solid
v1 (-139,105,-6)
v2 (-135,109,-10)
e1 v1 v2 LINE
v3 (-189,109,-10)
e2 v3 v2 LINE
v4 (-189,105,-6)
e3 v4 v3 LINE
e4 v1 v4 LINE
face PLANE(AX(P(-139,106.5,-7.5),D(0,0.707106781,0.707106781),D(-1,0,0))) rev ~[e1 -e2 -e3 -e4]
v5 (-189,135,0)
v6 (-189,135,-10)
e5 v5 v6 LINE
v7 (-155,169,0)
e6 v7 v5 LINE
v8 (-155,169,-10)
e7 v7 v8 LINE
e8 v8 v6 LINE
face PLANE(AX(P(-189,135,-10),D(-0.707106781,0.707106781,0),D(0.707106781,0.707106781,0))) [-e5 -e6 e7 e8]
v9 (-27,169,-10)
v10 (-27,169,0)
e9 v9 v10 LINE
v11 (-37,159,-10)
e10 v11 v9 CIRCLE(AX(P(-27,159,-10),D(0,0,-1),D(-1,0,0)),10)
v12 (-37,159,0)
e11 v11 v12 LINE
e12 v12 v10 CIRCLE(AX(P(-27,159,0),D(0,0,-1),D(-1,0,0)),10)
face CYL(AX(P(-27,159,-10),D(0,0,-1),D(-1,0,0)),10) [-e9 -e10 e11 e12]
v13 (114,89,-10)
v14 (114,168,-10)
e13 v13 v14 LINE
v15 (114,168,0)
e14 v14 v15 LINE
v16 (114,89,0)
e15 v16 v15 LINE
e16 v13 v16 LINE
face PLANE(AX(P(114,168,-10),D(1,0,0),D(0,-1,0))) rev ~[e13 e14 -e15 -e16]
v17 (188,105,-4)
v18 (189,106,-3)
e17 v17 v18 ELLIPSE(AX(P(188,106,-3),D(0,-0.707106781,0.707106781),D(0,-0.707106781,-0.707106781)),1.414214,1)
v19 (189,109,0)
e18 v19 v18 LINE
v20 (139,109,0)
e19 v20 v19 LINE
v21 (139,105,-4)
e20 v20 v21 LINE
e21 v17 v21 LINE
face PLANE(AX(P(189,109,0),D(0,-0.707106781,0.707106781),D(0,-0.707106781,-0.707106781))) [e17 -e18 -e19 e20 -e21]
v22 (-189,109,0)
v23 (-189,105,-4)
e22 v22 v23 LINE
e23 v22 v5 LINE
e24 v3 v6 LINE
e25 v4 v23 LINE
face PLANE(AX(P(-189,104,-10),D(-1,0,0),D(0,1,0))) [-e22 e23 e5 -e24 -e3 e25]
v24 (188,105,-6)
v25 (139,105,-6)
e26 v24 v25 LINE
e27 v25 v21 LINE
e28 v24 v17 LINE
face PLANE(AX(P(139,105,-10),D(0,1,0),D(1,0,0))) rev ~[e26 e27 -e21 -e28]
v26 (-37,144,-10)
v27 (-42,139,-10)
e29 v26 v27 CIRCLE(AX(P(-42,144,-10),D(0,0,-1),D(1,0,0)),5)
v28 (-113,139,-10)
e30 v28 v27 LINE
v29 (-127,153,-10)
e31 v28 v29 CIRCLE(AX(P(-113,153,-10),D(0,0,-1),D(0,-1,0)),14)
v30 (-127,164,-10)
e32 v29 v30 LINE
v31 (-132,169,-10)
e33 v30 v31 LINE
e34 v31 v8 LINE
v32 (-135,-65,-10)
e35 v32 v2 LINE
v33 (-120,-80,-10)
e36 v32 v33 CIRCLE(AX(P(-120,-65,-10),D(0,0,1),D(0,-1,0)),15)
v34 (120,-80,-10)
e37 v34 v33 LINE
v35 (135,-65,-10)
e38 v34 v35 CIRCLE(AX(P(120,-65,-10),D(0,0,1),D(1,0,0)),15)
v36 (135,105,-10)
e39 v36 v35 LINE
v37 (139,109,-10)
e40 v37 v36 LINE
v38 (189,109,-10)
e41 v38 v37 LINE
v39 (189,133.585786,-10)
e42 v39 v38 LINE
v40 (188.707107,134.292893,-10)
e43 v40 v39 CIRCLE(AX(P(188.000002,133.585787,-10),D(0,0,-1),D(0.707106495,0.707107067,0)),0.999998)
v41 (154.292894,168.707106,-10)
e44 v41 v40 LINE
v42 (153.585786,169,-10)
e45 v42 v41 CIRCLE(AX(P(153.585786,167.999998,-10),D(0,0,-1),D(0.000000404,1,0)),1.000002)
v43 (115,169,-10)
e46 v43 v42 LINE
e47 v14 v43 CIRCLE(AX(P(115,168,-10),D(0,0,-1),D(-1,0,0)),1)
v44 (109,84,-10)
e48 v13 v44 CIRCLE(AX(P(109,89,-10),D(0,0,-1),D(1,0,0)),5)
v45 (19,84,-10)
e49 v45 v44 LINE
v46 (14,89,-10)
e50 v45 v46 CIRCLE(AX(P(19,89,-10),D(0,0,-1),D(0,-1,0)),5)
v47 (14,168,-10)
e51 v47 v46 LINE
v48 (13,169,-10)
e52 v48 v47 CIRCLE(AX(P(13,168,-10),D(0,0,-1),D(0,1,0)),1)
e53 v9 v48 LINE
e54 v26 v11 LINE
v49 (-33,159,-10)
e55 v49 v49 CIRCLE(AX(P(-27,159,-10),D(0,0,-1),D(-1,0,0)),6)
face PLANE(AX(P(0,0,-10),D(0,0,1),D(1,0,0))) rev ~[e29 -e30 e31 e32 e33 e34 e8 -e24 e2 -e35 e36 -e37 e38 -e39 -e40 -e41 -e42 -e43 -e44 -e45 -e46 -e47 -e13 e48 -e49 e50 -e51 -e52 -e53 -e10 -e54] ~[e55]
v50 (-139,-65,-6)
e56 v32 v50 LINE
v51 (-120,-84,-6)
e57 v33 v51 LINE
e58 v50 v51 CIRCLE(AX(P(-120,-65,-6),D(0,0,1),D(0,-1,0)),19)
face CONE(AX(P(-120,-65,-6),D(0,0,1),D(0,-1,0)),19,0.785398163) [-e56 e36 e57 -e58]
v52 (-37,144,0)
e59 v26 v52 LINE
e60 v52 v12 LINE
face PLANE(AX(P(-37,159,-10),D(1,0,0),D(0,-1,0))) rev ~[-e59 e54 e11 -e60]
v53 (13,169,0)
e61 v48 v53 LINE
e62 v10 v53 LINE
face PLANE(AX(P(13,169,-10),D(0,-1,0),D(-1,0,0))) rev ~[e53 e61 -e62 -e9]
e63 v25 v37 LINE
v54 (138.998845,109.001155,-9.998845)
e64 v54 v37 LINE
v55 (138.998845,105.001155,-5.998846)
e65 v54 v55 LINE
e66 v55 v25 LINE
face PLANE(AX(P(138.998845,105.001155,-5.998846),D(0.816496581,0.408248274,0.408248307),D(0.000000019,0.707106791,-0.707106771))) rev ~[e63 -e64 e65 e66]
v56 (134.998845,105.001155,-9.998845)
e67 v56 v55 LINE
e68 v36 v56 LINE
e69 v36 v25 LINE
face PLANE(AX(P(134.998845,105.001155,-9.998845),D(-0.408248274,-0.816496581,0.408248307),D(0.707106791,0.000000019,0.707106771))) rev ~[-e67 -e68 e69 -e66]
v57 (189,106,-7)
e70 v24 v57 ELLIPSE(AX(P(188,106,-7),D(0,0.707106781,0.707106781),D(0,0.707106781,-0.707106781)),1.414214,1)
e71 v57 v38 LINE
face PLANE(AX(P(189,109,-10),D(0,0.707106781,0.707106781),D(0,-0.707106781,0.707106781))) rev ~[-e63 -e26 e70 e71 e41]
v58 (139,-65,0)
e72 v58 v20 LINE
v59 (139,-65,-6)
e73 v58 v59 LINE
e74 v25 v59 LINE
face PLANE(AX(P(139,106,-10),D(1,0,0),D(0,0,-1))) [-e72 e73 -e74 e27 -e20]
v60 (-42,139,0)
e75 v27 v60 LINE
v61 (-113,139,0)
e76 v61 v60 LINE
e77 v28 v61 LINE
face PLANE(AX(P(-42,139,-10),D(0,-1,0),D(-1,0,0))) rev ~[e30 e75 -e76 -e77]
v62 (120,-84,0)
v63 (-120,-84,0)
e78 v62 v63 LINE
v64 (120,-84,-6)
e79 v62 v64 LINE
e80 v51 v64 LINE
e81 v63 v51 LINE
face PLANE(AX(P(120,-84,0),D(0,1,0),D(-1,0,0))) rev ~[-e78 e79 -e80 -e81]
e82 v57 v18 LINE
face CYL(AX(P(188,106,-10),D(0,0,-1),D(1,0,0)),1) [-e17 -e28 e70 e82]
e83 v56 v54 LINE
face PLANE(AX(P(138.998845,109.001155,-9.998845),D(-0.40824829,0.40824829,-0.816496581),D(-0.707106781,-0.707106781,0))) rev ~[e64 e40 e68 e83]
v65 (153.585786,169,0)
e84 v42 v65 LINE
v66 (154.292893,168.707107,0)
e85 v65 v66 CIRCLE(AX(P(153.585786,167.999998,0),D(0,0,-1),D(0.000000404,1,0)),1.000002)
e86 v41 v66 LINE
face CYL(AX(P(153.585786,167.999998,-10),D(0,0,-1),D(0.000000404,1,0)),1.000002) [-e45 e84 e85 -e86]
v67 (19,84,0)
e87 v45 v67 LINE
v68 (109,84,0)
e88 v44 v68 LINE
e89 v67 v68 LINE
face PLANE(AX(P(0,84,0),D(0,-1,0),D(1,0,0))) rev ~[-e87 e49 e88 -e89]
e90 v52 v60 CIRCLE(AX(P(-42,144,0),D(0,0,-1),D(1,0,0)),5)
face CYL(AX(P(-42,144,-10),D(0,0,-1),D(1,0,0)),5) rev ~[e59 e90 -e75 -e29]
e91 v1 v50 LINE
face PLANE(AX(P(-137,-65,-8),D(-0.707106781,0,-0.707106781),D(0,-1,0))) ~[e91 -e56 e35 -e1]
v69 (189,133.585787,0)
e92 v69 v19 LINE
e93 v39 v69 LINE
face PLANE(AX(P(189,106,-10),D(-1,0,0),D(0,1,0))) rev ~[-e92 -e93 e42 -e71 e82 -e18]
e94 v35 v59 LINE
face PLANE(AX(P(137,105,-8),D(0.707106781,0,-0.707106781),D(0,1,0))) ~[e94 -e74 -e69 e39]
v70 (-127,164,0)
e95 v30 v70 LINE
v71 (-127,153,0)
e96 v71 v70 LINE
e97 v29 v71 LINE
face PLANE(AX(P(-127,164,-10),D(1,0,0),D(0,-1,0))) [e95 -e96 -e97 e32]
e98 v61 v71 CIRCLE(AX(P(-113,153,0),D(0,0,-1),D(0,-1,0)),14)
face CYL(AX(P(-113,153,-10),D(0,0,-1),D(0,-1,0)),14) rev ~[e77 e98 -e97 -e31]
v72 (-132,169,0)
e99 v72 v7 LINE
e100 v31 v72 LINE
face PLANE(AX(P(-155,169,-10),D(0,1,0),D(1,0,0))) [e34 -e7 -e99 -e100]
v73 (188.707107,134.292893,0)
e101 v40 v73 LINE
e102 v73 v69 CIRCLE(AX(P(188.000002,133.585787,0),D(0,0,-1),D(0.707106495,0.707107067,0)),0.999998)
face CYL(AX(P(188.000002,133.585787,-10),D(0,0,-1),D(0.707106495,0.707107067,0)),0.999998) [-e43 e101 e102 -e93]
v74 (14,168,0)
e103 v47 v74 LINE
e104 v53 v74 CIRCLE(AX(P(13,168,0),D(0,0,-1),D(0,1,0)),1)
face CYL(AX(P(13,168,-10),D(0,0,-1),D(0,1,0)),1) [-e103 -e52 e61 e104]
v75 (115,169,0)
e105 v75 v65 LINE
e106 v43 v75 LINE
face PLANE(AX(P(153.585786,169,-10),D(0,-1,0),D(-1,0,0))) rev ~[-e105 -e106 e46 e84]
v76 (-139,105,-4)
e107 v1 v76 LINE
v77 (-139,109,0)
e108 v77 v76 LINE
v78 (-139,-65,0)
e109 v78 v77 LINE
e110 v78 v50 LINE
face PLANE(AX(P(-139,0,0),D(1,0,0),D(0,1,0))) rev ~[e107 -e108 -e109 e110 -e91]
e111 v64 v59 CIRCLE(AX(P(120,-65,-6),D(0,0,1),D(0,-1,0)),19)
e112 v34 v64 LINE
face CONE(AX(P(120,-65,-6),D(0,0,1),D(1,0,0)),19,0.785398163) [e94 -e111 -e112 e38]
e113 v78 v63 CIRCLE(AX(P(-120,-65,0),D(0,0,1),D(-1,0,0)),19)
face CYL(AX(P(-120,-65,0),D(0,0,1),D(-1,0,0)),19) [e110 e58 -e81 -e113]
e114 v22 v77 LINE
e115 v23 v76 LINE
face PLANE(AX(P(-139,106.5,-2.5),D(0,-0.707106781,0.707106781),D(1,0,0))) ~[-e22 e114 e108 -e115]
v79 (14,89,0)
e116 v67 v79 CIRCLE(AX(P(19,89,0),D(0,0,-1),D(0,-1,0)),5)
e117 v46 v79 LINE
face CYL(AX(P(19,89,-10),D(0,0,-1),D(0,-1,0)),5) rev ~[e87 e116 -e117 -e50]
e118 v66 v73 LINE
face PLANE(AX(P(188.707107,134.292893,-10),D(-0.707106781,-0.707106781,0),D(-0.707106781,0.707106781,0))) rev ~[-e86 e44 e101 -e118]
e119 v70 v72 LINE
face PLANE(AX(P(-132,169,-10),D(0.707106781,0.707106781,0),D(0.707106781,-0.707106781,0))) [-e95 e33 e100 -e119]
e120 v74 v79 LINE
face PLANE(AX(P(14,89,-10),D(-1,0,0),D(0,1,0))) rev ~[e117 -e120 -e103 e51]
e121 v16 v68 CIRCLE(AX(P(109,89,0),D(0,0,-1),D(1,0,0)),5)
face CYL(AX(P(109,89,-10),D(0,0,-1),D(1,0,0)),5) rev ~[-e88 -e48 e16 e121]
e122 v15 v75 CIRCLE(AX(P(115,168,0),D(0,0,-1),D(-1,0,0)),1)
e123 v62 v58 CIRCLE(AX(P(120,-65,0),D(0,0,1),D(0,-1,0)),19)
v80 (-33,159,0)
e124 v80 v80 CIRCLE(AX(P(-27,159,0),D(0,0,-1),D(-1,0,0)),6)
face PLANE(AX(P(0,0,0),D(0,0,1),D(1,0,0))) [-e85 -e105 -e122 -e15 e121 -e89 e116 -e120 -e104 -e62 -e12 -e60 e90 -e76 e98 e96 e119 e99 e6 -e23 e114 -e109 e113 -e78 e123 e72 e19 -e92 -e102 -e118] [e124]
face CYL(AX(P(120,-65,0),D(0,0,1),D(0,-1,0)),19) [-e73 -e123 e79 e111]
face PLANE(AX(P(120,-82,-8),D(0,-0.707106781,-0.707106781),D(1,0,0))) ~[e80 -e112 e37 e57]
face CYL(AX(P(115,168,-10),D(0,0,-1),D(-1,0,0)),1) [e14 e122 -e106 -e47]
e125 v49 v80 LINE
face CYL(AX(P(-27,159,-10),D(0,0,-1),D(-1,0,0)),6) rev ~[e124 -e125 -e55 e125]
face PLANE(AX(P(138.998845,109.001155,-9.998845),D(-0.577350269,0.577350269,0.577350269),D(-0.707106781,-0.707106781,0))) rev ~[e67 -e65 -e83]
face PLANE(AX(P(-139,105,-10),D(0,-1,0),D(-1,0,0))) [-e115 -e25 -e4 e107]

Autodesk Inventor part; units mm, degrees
ref_plane "YZ Plane" through (0, 0, 0) normal (1, 0, 0) x (0, 1, 0)
ref_plane "XZ Plane" through (0, 0, 0) normal (0, 1, 0) x (-1, 0, 0)
ref_plane "XY Plane" through (0, 0, 0) normal (0, 0, 1) x (1, 0, 0)
sketch "Sketch1" plane through (0, 0, 0) normal (0, 0, 1) x (1, 0, 0)
  line L0 (0, 118.387006) -> (0, -122.322035)
  line L1 (-200.109041, 0) -> (200.109041, 0)
  line L2 (-139, 84) -> (139, 84)
  line L3 (139, 84) -> (139, -65)
  line L4 (120, -84) -> (-120, -84)
  line L5 (-139, -65) -> (-139, 84)
  arc A0 (-139, -65) -> (-120, -84) centre (-120, -65) ccw
  arc A1 (120, -84) -> (139, -65) centre (120, -65) ccw
  point P0 (0, 0)
  dimension "d0" = 278
  dimension "d1" = 168
  dimension "d2" = 19
extrude "Extrusion1" add sketch "Sketch1" against normal blind 10
sketch "Sketch2" plane through (0, 0, -10) normal (0, 0, -1) x (-1, 0, 0)
  line L0 (139, -65) -> (139, 84)
  line L1 (139, 84) -> (-139, 84)
  line L2 (-139, 84) -> (-139, -65)
  arc A0 (-139, -65) -> (-120, -84) centre (-120, -65) ccw
  line L3 (-120, -84) -> (120, -84)
  arc A1 (120, -84) -> (139, -65) centre (120, -65) ccw
  line L4 (-139, 84) -> (-139, 105)
  line L5 (-139, 105) -> (-188, 105)
  line L6 (-189, 106) -> (-189, 133.585786)
  line L7 (-188.707107, 134.292893) -> (-154.292893, 168.707107)
  line L8 (-153.585786, 169) -> (-115, 169)
  line L9 (-114, 168) -> (-114, 89)
  line L10 (-14, 89) -> (-14, 168)
  line L11 (-13, 169) -> (27, 169)
  line L12 (37, 159) -> (37, 144)
  line L13 (42, 139) -> (113, 139)
  line L14 (139, 84) -> (139, 104)
  line L15 (189, 104) -> (189, 135)
  line L16 (189, 135) -> (155, 169)
  line L17 (155, 169) -> (132, 169)
  arc A2 (-114, 89) -> (-109, 84) centre (-109, 89) ccw
  arc A3 (-19, 84) -> (-14, 89) centre (-19, 89) ccw
  arc A4 (-188.707107, 134.292893) -> (-189, 133.585786) centre (-188, 133.585786) ccw
  arc A5 (-189, 106) -> (-188, 105) centre (-188, 106) ccw
  arc A6 (-153.585786, 169) -> (-154.292893, 168.707107) centre (-153.585786, 168) ccw
  arc A7 (-114, 168) -> (-115, 169) centre (-115, 168) ccw
  arc A8 (-13, 169) -> (-14, 168) centre (-13, 168) ccw
  arc A9 (113, 139) -> (127, 153) centre (113, 153) ccw
  arc A10 (37, 144) -> (42, 139) centre (42, 144) ccw
  line L18 (127, 164) -> (127, 153)
  line L19 (139, 104) -> (189, 104)
  circle A11 centre (27, 159) radius 6
  arc A12 (37, 159) -> (27, 169) centre (27, 159) ccw
  line L20 (132, 169) -> (127, 164)
  line L21 (-139, 84) -> (-135, 84)
  line L22 (-139, 84) -> (-109, 84)
  line L23 (-139, 84) -> (139, 84)
  line L24 (-19, 84) -> (139, 84)
  point P0 (0, 0)
  point P1 (-189, 105)
  point P2 (-154, 169)
  point P3 (-14, 169)
  point P4 (37, 139)
  point P5 (127, 139)
  point P6 (127, 169)
  point P7 (135, 84)
  dimension "d8" = 21
  dimension "d9" = 50
  dimension "d10" = 85
  dimension "d11" = 75
  dimension "d12" = 135
  dimension "d13" = 40
  dimension "d14" = 100
  dimension "d16" = 90
  dimension "d17" = 50
  dimension "d19" = 34
  dimension "d20" = 135
  dimension "d21" = 5
  dimension "d22" = 1
  dimension "d23" = 14
  dimension "d24" = 5
  dimension "d26" = 90
  dimension "d29" = 12
  dimension "d30" = 226
  dimension "d31" = 5
  dimension "d32" = 5
  dimension "d33" = 55
  dimension "d34" = 20
  dimension "d35" = 16
  dimension "d36" = 75
  dimension "d37" = 112
  dimension "d38" = 26
extrude "Extrusion2" add sketch "Sketch2" against normal blind 10 contours L1 A3 L10 A8 L11 A12 L12 A10 L13 A9 L18 L20 L17 L16 L15 L19 L14 | L1 L4 L5 A5 L6 A4 L7 A6 L8 A7 L9 A2
chamfer "Chamfer2" distance 4 angle 45 6 edges at (139, 20, -10) (133.435, -78.435, -10) (0, -84, -10) (-133.435, -78.435, -10) (-139, 19.5, -10) (-164, 104, -10)
chamfer "Chamfer3" distance 4 angle 45 1 edges at (-164, 104, 0)
sketch "Sketch3" plane through (189, 106, -10) normal (1, 0, 0) x (0, 0, -1)
  line L0 (0, 27.585786) -> (0, 0)
  line L1 (0, 27.585786) -> (-10, 27.585786)
  line L2 (-10, 0) -> (-10, 27.585786)
  line L3 (0, 0) -> (-10, 0)
  line L4 (0, 0) -> (0, -1)
  line L5 (0, 0) -> (-10, 0)
  line L6 (-10, -1) -> (-10, 0)
  line L7 (0, -1) -> (-10, -1)
  line L8 (-10, 3) -> (-6, -1)
  line L9 (-10, 3) -> (-10, -1)
  line L10 (0, -1) -> (-10, -1)
  line L11 (-10, -1) -> (-6, -1)
  line L12 (-5, -1) -> (-5, 5.993177)
  line L13 (0, -1) -> (0, 0)
  line L14 (0, 3) -> (-4, -1)
  line L15 (0, 3) -> (0, -1)
  line L16 (0, -1) -> (-4, -1)
  point P0 (-10, -106)
  point P1 (-10, 3)
  point P2 (0, 3)
  dimension "d47" = 45
  dimension "d48" = 4
extrude "Extrusion3" cut sketch "Sketch3" against normal up to surface (50 mm away) contours L0 L3 L14 | L4 L7 L14 L3 | L8 L3 L2 | L3 L8 L7 L6
ref_plane "Work Plane1" through (139, 109, -10) normal (-0.5773503, 0.5773503, 0.5773503) x (-0.7071068, -0.7071068, 0)
sketch "Sketch4" plane through (139, 109, -10) normal (-0.5773503, 0.5773503, 0.5773503) x (-0.7071068, -0.7071068, 0)
  line L0 (2.828427, 4.898979) -> (-31.819805, 24.903146)
  line L1 (5.656854, 0) -> (2.828427, 4.898979)
  line L2 (-35.355339, 20.412415) -> (0, 0)
  line L3 (2.828427, 4.898979) -> (0, 0)
  line L4 (0, 0) -> (5.656854, 0)
  line L5 (5.656854, 0) -> (2.828427, 4.898979)
  point P0 (175.362482, -4.082483)
extrude "Extrusion4" cut sketch "Sketch4" against normal blind 10
move faces "Move1" translate (0, 1, 0) faces at (-172.333333, 104, -4.666667) (-155.666667, 105.333333, -2.666667) (-154.333333, 106.666667, -8.666667)
equation "\"d32\" = d31"
properties part number "SlipersLåda 211018003"
